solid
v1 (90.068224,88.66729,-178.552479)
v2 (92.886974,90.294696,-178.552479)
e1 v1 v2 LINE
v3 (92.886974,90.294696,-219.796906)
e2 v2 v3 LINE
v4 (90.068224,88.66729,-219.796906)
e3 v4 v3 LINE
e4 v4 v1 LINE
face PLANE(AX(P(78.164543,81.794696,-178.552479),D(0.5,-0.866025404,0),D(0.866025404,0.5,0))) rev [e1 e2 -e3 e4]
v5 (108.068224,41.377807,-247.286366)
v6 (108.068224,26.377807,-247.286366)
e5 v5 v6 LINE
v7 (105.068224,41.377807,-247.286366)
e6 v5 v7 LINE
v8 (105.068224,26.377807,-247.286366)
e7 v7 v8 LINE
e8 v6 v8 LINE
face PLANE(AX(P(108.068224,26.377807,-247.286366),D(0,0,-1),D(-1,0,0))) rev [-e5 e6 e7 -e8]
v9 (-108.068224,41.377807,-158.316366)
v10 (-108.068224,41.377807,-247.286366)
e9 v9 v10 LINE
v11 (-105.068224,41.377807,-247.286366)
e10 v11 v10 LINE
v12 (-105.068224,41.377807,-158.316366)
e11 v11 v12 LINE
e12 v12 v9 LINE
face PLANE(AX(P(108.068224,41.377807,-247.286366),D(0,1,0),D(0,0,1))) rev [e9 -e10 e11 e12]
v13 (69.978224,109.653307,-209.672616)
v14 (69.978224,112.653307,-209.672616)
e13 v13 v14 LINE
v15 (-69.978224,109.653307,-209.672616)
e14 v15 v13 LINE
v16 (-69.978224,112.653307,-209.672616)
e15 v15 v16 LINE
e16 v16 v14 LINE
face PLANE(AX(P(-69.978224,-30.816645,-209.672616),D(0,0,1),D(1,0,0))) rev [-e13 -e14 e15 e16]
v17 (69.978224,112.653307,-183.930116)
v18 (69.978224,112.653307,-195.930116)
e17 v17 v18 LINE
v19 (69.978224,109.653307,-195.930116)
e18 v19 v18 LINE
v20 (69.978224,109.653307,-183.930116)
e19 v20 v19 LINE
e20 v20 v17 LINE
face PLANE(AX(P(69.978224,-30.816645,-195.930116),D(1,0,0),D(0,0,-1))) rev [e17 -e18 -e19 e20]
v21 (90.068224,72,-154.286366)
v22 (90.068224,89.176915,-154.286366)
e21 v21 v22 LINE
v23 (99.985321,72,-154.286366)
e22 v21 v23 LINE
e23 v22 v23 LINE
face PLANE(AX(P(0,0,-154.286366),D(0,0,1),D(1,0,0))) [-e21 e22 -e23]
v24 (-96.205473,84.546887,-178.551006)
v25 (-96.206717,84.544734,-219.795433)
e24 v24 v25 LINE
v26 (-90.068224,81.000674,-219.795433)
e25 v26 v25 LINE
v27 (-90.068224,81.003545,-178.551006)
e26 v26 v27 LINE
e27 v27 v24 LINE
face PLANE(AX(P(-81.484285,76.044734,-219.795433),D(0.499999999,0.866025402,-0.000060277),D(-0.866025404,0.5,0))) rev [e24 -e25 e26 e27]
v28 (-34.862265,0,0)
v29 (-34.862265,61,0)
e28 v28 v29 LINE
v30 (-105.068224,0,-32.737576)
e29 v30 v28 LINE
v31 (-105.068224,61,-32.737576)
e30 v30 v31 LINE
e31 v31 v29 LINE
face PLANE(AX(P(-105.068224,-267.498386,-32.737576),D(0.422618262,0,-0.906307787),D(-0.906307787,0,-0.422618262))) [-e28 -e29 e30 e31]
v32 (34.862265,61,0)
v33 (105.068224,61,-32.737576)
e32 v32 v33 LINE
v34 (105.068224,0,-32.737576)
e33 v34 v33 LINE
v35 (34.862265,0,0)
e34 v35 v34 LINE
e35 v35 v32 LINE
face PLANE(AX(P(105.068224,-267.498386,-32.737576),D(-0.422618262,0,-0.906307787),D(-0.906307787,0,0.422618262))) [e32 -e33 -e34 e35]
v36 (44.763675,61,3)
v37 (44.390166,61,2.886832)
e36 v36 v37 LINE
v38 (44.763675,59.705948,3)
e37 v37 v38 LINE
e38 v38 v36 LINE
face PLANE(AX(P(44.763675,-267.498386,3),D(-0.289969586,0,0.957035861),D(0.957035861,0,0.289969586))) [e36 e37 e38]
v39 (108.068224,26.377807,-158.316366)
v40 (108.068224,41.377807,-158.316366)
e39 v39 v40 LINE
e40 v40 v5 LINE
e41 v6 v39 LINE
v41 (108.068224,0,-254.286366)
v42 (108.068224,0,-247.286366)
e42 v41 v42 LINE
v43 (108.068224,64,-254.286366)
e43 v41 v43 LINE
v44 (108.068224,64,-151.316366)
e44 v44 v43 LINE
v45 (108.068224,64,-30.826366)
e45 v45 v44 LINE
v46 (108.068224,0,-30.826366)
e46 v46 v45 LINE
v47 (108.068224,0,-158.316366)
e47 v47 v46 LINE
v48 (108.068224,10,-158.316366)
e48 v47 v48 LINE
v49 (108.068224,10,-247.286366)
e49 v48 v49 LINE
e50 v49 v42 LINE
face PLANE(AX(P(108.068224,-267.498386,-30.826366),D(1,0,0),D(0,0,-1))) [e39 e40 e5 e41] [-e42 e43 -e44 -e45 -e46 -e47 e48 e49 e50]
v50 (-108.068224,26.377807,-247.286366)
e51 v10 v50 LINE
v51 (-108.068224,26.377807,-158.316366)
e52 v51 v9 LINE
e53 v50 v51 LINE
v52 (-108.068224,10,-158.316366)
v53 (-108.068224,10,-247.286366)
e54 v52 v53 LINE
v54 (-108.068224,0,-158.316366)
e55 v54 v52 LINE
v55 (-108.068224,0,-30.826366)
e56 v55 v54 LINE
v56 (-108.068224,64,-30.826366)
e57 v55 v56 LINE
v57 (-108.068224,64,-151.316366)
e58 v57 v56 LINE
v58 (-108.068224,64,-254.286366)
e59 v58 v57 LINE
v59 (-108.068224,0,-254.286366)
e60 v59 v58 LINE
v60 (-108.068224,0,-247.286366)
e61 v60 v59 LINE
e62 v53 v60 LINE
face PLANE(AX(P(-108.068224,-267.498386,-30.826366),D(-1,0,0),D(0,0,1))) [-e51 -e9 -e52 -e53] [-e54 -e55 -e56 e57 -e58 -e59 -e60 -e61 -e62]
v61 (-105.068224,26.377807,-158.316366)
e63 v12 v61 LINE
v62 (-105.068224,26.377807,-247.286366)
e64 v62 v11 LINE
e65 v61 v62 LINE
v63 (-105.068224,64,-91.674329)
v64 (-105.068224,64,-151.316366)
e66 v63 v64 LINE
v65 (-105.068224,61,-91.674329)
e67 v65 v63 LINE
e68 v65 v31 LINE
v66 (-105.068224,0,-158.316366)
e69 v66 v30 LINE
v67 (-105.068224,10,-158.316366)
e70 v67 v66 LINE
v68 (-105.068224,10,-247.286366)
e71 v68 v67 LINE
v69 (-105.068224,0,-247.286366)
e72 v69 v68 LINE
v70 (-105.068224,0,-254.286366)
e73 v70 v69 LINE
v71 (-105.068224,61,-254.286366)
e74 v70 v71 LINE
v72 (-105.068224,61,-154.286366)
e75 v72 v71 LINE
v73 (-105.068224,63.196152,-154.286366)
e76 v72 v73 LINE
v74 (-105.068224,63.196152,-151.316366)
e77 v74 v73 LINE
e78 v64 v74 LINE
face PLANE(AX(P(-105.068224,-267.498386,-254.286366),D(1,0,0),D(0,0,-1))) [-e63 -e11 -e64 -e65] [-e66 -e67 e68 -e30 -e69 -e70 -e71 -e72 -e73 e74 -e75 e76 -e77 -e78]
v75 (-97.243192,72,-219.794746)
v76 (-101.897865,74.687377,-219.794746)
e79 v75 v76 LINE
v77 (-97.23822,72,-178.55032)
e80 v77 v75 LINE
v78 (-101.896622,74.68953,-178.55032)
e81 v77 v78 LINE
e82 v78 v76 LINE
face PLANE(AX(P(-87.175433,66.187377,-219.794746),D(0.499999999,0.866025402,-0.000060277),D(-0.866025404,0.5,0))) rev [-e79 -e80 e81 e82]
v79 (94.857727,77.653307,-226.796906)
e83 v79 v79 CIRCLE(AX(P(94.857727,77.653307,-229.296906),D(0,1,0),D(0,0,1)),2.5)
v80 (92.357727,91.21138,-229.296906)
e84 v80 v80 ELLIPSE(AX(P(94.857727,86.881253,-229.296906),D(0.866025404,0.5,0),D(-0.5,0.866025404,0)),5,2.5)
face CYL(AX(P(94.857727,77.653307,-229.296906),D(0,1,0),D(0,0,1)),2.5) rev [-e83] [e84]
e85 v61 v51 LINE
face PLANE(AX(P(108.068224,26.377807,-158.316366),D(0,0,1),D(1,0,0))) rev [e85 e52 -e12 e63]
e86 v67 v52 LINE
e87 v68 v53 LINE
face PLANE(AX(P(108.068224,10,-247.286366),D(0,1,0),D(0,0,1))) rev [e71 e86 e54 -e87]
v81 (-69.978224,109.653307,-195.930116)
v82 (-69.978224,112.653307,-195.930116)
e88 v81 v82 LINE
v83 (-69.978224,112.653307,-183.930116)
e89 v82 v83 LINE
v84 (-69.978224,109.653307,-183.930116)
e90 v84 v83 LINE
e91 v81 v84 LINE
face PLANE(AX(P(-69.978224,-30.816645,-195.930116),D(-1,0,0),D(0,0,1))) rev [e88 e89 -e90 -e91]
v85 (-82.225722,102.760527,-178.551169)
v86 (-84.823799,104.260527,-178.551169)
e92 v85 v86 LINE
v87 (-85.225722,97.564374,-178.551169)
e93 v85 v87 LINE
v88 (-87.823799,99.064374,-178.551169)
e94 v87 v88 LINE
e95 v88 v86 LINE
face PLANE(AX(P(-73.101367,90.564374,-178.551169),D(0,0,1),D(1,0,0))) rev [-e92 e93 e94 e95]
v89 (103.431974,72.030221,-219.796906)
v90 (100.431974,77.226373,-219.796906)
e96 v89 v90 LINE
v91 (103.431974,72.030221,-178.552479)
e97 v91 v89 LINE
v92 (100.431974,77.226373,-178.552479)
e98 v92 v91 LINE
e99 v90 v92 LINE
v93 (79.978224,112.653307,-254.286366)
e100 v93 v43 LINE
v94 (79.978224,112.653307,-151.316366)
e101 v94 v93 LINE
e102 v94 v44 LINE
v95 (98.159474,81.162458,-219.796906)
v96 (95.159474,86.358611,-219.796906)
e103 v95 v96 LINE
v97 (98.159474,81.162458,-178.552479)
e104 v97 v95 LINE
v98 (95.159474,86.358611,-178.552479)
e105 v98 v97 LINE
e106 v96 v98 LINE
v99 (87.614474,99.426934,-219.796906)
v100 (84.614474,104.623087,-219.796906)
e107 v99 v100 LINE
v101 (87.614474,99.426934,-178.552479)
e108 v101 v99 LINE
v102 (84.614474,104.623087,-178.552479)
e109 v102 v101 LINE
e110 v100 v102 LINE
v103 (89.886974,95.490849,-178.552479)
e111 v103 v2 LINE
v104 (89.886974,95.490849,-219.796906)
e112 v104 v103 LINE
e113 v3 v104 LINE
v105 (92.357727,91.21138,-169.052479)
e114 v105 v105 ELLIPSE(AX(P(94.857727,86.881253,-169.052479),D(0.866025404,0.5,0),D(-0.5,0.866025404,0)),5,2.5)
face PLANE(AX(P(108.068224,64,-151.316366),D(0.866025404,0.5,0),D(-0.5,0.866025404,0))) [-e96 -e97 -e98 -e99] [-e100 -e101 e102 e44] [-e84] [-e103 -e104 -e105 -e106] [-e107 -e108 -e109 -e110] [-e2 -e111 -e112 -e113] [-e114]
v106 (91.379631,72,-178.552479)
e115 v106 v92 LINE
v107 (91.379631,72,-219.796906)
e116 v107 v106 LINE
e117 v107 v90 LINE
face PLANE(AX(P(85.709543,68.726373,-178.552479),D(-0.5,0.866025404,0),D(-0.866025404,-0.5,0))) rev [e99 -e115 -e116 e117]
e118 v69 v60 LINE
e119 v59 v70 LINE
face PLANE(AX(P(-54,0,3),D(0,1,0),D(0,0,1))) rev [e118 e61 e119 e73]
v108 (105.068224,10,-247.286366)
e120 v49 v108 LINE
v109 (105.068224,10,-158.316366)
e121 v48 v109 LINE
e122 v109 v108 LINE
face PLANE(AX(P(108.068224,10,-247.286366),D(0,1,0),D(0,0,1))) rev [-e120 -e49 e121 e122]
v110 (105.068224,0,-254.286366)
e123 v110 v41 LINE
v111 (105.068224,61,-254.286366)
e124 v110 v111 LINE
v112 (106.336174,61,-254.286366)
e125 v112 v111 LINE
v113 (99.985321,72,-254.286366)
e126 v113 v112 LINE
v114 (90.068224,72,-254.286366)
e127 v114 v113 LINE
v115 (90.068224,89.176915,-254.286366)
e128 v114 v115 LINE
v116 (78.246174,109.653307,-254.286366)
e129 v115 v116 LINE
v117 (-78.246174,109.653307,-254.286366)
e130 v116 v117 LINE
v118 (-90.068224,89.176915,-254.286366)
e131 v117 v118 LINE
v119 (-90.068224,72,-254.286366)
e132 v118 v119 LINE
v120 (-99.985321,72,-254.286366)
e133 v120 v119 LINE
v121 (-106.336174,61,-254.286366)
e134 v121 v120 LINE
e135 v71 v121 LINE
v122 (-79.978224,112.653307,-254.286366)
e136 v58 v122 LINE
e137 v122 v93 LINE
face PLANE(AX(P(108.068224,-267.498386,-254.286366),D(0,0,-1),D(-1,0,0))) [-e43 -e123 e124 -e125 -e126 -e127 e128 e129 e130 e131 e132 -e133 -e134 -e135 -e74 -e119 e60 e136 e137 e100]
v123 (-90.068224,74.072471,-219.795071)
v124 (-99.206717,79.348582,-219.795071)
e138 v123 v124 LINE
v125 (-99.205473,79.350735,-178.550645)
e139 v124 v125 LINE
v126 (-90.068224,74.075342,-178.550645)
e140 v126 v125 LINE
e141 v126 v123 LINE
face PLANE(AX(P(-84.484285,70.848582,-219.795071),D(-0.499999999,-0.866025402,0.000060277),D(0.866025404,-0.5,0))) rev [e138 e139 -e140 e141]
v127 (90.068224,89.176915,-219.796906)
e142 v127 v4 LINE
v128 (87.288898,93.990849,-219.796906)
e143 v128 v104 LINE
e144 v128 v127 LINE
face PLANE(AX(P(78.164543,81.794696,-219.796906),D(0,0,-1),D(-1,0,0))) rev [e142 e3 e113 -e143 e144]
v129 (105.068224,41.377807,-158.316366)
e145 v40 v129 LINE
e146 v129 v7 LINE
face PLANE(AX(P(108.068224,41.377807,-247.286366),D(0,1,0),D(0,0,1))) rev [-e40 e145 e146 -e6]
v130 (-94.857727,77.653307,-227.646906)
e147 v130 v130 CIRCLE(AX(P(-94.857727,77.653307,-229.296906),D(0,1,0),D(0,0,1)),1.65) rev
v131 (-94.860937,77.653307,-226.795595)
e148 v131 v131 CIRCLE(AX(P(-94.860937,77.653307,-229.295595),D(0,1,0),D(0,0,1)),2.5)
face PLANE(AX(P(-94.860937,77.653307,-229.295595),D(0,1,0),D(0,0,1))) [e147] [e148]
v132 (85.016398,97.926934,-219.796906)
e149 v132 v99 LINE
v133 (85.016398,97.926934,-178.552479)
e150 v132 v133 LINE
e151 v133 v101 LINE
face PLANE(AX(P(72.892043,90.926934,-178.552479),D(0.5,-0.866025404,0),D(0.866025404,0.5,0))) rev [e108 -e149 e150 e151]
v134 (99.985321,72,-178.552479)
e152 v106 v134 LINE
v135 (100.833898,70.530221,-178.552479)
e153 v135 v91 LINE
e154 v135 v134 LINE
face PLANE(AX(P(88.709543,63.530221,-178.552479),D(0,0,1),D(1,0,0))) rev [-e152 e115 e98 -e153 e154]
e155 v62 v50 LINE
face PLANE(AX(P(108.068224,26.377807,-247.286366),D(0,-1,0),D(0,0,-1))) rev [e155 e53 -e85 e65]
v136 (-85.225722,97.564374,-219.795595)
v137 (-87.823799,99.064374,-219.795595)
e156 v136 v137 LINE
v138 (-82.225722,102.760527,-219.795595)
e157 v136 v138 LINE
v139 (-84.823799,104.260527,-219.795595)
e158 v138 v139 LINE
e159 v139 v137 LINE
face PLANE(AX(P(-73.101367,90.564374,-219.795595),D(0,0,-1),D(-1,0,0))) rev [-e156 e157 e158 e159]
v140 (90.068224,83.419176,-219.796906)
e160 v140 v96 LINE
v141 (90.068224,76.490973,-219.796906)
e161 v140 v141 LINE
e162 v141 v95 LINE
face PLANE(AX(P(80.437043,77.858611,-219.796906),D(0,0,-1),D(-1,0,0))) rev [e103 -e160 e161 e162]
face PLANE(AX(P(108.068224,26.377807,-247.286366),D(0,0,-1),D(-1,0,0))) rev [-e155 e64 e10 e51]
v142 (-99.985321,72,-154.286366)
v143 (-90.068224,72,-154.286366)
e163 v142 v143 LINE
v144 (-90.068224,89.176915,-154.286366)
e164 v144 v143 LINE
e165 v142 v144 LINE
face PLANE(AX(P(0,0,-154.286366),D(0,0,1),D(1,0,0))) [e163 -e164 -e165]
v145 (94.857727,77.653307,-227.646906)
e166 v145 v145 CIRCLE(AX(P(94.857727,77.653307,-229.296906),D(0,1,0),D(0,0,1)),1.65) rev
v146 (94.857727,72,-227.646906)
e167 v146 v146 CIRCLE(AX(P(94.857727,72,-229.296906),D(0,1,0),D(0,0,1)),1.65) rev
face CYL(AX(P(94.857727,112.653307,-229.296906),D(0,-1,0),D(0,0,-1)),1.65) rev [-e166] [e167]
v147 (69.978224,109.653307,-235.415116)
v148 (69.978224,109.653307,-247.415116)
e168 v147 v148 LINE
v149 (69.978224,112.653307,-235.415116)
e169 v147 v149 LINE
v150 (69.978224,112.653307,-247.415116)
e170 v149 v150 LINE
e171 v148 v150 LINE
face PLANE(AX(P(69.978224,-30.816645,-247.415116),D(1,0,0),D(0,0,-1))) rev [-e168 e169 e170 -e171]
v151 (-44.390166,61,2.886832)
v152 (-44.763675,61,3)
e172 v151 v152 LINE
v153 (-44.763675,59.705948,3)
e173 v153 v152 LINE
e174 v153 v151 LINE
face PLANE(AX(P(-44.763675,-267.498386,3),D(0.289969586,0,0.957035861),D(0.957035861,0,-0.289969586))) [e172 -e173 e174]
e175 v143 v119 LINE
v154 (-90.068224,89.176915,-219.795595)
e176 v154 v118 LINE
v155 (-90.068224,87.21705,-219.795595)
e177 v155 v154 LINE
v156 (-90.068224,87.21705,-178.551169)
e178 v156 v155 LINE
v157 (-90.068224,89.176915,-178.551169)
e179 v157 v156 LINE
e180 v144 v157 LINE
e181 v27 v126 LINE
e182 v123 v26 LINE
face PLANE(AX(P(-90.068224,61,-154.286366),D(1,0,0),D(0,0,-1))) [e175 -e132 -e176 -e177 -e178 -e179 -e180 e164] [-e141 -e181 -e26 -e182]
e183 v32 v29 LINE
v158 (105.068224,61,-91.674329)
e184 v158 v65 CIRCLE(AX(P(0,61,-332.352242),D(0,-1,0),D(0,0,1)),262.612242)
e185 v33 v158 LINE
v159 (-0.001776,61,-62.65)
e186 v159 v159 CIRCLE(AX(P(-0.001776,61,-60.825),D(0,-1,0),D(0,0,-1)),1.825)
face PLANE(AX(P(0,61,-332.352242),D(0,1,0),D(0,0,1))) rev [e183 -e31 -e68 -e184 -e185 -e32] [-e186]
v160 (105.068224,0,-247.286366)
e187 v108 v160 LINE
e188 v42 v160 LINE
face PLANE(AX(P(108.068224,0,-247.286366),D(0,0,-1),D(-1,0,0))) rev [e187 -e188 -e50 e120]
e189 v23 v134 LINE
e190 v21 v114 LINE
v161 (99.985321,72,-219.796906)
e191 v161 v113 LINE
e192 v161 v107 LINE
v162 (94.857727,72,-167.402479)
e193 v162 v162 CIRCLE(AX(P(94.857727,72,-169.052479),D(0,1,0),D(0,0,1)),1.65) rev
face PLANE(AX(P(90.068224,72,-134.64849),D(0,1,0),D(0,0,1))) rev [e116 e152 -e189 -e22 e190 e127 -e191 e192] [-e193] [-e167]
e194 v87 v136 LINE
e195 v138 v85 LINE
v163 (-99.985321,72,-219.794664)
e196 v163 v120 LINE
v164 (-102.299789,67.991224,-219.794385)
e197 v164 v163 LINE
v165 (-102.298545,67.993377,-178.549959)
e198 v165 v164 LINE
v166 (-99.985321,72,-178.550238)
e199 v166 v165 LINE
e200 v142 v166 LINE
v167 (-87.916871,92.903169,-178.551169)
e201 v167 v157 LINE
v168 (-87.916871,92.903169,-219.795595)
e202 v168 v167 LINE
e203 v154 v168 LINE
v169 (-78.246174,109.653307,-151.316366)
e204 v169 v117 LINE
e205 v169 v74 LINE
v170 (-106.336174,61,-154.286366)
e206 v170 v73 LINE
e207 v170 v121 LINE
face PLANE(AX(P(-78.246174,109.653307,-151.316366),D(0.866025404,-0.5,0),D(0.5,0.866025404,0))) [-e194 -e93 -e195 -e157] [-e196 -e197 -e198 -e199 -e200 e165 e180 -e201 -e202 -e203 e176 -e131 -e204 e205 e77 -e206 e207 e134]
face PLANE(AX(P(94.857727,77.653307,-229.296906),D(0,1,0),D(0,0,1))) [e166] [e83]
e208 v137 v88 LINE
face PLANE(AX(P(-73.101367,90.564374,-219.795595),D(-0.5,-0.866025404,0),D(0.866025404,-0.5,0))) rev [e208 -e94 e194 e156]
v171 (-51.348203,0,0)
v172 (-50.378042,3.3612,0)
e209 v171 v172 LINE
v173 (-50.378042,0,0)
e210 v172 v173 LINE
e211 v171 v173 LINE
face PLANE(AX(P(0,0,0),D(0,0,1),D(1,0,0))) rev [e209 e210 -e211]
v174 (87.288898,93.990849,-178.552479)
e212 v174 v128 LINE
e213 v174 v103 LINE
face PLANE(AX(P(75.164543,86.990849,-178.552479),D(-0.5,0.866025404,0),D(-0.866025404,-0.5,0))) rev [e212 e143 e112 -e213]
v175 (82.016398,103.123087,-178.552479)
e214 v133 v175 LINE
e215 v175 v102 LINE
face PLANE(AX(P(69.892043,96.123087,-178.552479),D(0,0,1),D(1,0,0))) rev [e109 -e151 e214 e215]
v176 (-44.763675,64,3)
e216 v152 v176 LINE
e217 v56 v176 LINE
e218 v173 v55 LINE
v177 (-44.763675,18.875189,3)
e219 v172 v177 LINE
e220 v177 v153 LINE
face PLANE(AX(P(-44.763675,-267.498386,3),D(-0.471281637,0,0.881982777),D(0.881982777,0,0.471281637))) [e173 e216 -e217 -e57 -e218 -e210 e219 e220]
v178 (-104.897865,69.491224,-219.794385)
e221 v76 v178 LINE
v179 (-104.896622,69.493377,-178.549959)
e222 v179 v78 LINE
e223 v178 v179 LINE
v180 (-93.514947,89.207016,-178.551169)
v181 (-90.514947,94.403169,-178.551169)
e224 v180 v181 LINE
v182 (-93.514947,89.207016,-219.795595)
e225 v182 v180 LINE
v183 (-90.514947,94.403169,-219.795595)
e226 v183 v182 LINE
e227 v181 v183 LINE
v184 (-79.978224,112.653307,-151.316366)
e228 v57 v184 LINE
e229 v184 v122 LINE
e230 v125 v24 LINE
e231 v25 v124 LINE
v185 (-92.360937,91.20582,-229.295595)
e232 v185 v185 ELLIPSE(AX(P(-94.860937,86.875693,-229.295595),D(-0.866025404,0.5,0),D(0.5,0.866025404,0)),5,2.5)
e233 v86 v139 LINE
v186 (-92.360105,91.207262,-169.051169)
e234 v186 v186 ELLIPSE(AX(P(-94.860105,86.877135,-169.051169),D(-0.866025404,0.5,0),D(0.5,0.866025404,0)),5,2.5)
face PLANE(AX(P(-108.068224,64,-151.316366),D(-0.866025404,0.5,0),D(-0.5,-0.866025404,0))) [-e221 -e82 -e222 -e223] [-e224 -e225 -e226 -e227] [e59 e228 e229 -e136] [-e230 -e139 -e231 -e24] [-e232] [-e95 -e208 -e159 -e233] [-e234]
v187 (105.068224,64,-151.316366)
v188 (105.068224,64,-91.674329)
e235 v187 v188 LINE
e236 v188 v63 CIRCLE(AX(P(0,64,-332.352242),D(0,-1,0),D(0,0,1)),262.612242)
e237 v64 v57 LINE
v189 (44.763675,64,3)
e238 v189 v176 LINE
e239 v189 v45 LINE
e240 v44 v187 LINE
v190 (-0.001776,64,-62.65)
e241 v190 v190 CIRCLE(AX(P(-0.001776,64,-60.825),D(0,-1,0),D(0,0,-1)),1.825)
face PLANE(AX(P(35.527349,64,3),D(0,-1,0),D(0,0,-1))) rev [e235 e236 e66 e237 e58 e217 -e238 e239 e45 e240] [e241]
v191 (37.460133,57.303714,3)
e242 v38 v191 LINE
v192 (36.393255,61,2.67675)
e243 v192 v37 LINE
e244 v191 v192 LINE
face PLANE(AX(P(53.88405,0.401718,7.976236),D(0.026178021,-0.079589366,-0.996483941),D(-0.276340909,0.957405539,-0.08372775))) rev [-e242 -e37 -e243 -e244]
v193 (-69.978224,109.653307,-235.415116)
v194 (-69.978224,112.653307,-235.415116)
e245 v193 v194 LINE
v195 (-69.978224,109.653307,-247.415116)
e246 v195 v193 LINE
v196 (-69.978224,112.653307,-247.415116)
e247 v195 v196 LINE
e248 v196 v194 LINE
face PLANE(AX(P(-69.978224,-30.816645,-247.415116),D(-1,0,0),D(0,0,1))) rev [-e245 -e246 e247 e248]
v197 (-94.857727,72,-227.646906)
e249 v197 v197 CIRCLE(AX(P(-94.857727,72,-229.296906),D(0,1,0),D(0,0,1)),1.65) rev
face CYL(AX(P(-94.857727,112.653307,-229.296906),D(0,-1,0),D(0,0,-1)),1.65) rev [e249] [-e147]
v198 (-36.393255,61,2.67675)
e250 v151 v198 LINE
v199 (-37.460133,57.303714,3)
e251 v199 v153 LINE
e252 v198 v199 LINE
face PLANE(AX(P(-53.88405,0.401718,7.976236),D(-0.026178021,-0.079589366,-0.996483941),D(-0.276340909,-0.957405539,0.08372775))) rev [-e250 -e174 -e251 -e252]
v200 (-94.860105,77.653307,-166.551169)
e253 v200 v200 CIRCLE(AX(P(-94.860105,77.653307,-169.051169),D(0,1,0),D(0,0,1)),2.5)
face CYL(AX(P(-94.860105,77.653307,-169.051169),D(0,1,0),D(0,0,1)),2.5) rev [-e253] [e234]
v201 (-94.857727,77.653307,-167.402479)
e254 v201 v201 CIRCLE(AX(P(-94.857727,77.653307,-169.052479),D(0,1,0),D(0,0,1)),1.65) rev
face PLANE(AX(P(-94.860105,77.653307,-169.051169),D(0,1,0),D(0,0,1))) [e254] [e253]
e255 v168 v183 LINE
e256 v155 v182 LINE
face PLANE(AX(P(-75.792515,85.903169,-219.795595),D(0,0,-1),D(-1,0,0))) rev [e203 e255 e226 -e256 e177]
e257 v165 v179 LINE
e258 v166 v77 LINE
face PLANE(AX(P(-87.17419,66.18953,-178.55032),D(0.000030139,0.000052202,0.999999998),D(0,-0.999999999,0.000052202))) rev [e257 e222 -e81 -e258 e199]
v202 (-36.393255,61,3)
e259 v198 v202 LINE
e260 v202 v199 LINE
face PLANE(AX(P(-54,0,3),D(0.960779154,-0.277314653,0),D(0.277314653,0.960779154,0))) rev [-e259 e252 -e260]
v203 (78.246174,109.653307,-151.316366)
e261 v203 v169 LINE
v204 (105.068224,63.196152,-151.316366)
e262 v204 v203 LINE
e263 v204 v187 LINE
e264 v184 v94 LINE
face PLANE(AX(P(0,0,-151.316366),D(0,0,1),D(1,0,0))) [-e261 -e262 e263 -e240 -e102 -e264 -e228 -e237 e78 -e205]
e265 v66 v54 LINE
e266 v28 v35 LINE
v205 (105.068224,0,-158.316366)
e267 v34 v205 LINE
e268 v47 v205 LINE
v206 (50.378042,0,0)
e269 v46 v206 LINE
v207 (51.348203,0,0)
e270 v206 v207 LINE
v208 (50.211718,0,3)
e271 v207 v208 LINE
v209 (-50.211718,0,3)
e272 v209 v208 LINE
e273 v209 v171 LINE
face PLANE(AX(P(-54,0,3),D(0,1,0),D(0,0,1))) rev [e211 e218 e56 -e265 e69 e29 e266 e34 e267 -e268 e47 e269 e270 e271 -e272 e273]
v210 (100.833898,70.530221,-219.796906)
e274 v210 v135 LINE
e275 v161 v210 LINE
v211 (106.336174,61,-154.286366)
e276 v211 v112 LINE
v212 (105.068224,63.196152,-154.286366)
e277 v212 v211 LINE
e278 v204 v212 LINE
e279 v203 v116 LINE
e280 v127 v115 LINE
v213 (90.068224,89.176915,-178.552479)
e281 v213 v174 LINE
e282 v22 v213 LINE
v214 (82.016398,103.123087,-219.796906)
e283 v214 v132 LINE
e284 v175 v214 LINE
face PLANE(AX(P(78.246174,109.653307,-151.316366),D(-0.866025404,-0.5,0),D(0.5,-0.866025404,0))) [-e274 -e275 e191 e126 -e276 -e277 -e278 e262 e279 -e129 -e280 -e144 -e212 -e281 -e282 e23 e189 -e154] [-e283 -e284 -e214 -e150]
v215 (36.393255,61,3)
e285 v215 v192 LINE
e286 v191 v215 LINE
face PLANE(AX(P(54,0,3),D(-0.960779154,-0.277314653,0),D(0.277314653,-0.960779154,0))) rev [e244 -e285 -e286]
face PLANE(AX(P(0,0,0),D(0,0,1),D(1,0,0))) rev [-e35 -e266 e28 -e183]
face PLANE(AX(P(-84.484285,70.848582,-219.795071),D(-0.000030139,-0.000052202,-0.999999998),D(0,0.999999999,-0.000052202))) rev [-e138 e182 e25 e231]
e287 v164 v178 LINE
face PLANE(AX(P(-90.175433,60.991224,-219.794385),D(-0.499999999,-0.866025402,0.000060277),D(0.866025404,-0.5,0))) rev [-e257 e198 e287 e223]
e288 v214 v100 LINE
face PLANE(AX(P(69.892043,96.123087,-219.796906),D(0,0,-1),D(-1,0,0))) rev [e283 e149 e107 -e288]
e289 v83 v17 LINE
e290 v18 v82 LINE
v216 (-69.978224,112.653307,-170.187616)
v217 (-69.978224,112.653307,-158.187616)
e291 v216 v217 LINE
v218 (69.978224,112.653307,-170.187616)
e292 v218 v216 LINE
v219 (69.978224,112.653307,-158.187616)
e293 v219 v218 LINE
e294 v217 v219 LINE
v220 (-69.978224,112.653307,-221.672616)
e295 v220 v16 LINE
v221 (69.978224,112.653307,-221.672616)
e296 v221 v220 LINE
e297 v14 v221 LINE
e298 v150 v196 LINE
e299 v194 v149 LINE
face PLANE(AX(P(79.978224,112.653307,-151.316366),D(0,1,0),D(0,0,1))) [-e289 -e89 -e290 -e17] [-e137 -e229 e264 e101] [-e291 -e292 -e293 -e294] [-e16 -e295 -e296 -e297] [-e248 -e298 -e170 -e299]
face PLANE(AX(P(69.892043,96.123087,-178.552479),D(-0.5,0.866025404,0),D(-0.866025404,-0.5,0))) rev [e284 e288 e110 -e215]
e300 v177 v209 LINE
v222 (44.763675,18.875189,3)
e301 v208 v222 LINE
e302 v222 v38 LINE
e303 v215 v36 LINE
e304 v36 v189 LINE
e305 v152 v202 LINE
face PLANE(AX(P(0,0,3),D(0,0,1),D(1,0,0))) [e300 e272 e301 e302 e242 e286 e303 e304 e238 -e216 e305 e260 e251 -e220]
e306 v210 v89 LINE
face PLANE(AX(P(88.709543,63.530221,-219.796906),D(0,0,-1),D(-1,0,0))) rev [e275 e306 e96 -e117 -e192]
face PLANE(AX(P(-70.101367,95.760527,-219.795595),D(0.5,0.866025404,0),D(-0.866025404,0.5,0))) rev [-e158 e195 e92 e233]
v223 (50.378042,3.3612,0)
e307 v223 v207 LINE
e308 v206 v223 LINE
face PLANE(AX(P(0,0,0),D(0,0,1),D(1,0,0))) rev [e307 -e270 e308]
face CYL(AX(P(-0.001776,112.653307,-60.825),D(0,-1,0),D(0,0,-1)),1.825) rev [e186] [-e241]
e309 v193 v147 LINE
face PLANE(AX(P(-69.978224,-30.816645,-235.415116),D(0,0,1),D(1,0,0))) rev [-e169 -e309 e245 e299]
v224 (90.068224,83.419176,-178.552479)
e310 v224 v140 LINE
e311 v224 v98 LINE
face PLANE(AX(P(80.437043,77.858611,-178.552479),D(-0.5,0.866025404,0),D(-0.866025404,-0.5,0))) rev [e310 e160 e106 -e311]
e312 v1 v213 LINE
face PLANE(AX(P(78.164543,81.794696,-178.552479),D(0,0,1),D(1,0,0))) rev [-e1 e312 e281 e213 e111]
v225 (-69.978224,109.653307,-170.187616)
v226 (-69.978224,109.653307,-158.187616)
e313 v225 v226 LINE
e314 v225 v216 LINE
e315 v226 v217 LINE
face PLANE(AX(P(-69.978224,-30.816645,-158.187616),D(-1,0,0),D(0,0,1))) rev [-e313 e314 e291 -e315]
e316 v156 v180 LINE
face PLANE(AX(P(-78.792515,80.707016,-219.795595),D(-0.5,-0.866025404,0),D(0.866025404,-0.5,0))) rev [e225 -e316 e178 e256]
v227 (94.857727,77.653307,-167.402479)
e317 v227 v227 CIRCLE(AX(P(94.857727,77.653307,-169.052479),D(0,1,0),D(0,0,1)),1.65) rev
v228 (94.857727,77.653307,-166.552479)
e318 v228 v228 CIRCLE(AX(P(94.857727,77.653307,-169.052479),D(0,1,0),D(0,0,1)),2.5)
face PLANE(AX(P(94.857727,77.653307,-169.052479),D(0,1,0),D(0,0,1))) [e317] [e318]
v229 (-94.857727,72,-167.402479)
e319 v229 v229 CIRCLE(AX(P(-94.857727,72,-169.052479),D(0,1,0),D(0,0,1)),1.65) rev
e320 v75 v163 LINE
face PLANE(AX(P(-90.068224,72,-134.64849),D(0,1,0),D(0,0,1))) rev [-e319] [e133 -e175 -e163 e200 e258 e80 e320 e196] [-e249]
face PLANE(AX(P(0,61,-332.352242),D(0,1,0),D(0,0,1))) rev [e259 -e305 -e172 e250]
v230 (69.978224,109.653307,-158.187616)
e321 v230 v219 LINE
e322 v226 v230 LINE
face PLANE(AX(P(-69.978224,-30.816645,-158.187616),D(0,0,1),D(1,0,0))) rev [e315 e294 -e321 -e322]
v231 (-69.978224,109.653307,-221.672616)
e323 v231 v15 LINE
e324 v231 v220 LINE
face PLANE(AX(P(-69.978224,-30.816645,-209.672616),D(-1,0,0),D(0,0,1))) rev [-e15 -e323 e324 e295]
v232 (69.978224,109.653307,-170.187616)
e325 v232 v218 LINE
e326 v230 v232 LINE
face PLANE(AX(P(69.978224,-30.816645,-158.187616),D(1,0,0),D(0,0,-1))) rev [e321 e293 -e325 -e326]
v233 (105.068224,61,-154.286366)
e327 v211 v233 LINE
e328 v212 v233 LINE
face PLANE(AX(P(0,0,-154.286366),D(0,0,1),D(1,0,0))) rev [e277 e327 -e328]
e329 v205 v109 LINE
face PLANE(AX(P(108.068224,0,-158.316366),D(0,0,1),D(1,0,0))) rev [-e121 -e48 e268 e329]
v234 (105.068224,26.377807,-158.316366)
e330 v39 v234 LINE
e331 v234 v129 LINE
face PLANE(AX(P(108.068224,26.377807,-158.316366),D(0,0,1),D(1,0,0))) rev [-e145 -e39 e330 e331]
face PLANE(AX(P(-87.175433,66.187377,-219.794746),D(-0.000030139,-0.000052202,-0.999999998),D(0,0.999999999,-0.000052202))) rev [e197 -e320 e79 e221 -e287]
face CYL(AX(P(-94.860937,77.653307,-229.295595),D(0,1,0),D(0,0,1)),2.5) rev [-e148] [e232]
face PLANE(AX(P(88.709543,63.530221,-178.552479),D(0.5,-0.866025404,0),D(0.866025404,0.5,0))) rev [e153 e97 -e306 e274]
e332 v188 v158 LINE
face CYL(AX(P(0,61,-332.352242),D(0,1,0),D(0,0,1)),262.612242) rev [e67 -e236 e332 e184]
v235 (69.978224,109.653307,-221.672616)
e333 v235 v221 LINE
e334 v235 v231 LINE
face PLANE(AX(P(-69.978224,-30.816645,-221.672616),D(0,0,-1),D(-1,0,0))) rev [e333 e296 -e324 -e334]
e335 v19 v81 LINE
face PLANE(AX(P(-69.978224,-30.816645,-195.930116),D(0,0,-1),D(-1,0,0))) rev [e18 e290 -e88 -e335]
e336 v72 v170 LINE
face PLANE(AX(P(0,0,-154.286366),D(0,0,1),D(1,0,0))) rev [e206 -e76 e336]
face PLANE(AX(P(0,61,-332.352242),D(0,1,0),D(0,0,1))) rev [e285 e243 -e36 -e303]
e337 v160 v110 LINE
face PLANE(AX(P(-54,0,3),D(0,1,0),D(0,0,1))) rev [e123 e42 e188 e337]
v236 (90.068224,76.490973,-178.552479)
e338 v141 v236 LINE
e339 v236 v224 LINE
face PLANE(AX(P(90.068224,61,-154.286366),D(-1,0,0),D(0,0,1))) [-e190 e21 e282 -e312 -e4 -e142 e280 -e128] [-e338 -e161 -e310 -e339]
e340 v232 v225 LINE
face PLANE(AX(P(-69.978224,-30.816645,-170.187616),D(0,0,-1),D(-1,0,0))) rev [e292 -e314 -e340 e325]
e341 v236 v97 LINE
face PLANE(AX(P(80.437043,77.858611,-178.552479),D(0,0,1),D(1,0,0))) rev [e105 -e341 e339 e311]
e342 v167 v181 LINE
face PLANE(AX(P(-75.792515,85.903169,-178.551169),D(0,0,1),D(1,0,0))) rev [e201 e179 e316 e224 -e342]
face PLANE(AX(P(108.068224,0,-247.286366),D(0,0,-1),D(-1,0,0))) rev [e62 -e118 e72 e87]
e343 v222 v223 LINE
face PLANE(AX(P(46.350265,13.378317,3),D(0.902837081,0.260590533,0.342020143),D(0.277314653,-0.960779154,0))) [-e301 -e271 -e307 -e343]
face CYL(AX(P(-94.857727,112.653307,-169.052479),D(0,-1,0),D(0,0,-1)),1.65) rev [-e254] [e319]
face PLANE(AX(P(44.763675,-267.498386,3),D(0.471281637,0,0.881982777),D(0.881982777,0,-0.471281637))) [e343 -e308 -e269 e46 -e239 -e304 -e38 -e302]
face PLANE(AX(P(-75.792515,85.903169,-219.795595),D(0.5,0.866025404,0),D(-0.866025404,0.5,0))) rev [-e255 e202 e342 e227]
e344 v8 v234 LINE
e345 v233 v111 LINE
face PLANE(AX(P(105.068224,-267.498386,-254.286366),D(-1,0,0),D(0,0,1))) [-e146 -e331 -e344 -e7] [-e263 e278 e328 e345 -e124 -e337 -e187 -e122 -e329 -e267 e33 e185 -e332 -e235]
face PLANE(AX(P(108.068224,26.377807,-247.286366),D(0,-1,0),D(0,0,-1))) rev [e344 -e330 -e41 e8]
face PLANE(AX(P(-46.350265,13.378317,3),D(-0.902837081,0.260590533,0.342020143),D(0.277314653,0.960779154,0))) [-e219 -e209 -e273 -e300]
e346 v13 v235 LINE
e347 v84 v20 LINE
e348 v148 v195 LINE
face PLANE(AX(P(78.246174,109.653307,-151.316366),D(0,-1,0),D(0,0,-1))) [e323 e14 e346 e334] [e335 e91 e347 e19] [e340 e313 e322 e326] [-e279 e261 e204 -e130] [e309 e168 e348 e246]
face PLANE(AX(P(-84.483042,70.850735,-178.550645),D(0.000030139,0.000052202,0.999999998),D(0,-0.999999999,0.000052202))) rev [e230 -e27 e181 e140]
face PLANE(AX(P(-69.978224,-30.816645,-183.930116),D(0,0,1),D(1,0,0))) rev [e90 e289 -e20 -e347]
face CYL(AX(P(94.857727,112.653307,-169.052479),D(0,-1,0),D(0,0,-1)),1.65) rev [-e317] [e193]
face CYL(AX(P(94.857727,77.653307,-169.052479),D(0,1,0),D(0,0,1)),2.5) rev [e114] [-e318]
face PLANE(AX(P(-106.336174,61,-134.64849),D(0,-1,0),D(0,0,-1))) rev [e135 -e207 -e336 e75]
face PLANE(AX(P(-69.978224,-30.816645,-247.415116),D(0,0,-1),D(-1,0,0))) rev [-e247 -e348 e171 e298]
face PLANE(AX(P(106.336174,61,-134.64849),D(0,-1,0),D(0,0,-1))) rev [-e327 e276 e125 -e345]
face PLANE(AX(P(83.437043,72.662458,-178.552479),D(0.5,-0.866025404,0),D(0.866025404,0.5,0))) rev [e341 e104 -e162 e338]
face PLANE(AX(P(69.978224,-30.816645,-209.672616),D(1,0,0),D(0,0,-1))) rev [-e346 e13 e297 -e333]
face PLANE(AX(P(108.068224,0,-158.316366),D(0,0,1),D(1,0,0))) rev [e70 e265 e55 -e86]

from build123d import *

# Parameters (mm, degrees)
SALIENTE_EXTRUIR15_DEPTH = 3
SALIENTE_EXTRUIR16_REACH = 85.791
CHAFL_N1_SIZE            = 8
CHAFL_N1_SIZE_2          = 2.205109306
CHAFL_N2_SIZE            = 2.205109306
CHAFL_N2_SIZE_2          = 8
SALIENTE_EXTRUIR17_DEPTH = 3
SALIENTE_EXTRUIR18_DEPTH = 102.97
CROQUIS28_R              = 1.825
CORTAR_EXTRUIR6_DEPTH    = 283.951050372
SALIENTE_EXTRUIR19_DEPTH = 100
CROQUIS30_R              = 1.65
CORTAR_EXTRUIR7_DEPTH    = 283.951050372
CORTAR_EXTRUIR9_REACH    = 302.941
CORTAR_EXTRUIR10_START   = -40.653307
CROQUIS34_R              = 2.5
CORTAR_EXTRUIR10_DEPTH   = 35
CROQUIS35_W              = 41.244426213
CROQUIS35_H              = 6
CORTAR_EXTRUIR11_DEPTH   = 17
CROQUIS36_W              = 41.244426207
CROQUIS36_H              = 6
CORTAR_EXTRUIR12_DEPTH   = 17
CROQUIS37_W              = 139.956448948
CROQUIS37_H              = 12
CORTAR_EXTRUIR13_DEPTH   = 3
CROQUIS39_W              = 88.97
CROQUIS39_H              = 15
CROQUIS39_H_2            = 10
CORTAR_EXTRUIR14_DEPTH   = 353.231866742
CHAFL_N4_SIZE            = 3.639702343
CHAFL_N4_SIZE_2          = 10


with BuildPart() as part:
    # Croquis22 → Saliente-Extruir15 (new body)
    with BuildSketch(Plane.XY):
        Polygon((-54, 0), (54, 0), (35.527349199, 64), (-35.527349199, 64), align=None)
    extrude(amount=SALIENTE_EXTRUIR15_DEPTH)

    # Saliente-Extruir16: up to this face of the body (flat: up to its plane)
    saliente_extruir16_end = Plane(part.part.faces().sort_by_distance((0, 0, 1.5))[0])
    # Croquis23 → Saliente-Extruir16 (add, up to the picked face)
    with BuildSketch(Plane(origin=(0, 64, 0), x_dir=(1, 0, 0), z_dir=(0, 1, 0)), mode=Mode.PRIVATE) as saliente_extruir16_sk1:
        Polygon((108.068224474, 30.82636567), (108.068224474, 254.28636567), (105.068224474, 254.28636567), (105.068224474, 32.737576452), (34.862265211, 0), (44.7636746, -3), align=None)
    saliente_extruir16_tool1 = split(extrude(saliente_extruir16_sk1.sketch, amount=-SALIENTE_EXTRUIR16_REACH, mode=Mode.PRIVATE), bisect_by=saliente_extruir16_end, keep=Keep.BOTH, mode=Mode.PRIVATE)
    # Croquis23 → Saliente-Extruir16 (add, up to the picked face)
    with BuildSketch(Plane(origin=(0, 64, 0), x_dir=(1, 0, 0), z_dir=(0, 1, 0)), mode=Mode.PRIVATE) as saliente_extruir16_sk2:
        Polygon((-44.7636746, -3), (-108.068224474, 30.82636567), (-108.068224474, 254.28636567), (-105.068224474, 254.28636567), (-105.068224474, 32.737576452), (-34.862265211, 0), align=None)
    saliente_extruir16_tool2 = split(extrude(saliente_extruir16_sk2.sketch, amount=-SALIENTE_EXTRUIR16_REACH, mode=Mode.PRIVATE), bisect_by=saliente_extruir16_end, keep=Keep.BOTH, mode=Mode.PRIVATE)
    add(saliente_extruir16_tool1.solids().sort_by(Axis((105.393241, 64, -142.556366), (0, -1, 0)))[0])
    add(saliente_extruir16_tool2.solids().sort_by(Axis((-75.155279, 64, -16.272473), (0, -1, 0)))[0])

    # Chaflán1
    # the kernel refuses this chamfer: 8, 2.205109306 mm, written as the material it adds along each edge
    with BuildSketch(Plane(origin=(-50.503325007, 12.114514694, 4.739040428), x_dir=(-0.919298302367056, 0.2887303877017334, 0.267442319917128), z_dir=(0.2763409092722936, 0.9574055388276669, -0.0837277497886264))) as chafl_n1_piece_1_section:
        Polygon((CHAFL_N1_SIZE * 0.999943641705, CHAFL_N1_SIZE * 0.0106166574103), (CHAFL_N1_SIZE_2 * 0.268384707917, CHAFL_N1_SIZE_2 * 0.963311812656), (0, 0), align=None)
    chafl_n1_piece_1 = extrude(amount=74.96402277, mode=Mode.PRIVATE)
    chafl_n1_piece_1 = split(chafl_n1_piece_1, bisect_by=Plane(origin=(-40.189826284, 64, 2.253573464), z_dir=(0, -1, 0)), keep=Keep.TOP, mode=Mode.PRIVATE)
    chafl_n1_piece_1 = split(chafl_n1_piece_1, bisect_by=Plane(origin=(-40.189826284, 55.464802275, 3), z_dir=(0, 0, -1)), keep=Keep.TOP, mode=Mode.PRIVATE)
    add(chafl_n1_piece_1)

    # Chaflán2
    # the kernel refuses this chamfer: 8, 2.205109306 mm, written as the material it adds along each edge
    with BuildSketch(Plane(origin=(50.503325007, 12.114514694, 4.739040428), x_dir=(-0.1610184044916604, 0.03976595413217484, 0.9861499593403216), z_dir=(-0.27634090927229366, 0.957405538827667, -0.08372774978862642))) as chafl_n2_piece_1_section:
        Polygon((CHAFL_N2_SIZE * 0.989624861472, CHAFL_N2_SIZE * 0.143675444677), (CHAFL_N2_SIZE_2 * 0.137719182616, CHAFL_N2_SIZE_2 * 0.990471315455), (0, 0), align=None)
    chafl_n2_piece_1 = extrude(amount=74.96402277, mode=Mode.PRIVATE)
    chafl_n2_piece_1 = split(chafl_n2_piece_1, bisect_by=Plane(origin=(40.189826284, 55.464802275, 3), z_dir=(0, 0, -1)), keep=Keep.TOP, mode=Mode.PRIVATE)
    chafl_n2_piece_1 = split(chafl_n2_piece_1, bisect_by=Plane(origin=(40.189826284, 64, 2.253573464), z_dir=(0, -1, 0)), keep=Keep.TOP, mode=Mode.PRIVATE)
    add(chafl_n2_piece_1)

    # Croquis24 → Saliente-Extruir17 (add)
    with BuildSketch(Plane(origin=(0, 64, 0), x_dir=(1, 0, 0), z_dir=(0, 1, 0))):
        with BuildLine():
            Line((-108.068224474, 93.00636567), (-108.068224474, 30.82636567))
            Line((-108.068224474, 30.82636567), (-44.7636746, -3))
            Line((-44.7636746, -3), (44.7636746, -3))
            Line((44.7636746, -3), (108.068224474, 30.82636567))
            Line((108.068224474, 30.82636567), (108.068224474, 93.00636567))
            ThreePointArc((108.068224474, 93.00636567), (0, 69.74), (-108.068224474, 93.00636567))
        make_face()
    extrude(amount=-SALIENTE_EXTRUIR17_DEPTH)

    # Croquis25 → Saliente-Extruir18 (add)
    with BuildSketch(Plane(origin=(0, 0, -254.28636567), x_dir=(-1, 0, 0), z_dir=(0, 0, -1))):
        Polygon((-108.068224474, 64), (-79.978224474, 112.653307185), (79.978224474, 112.653307185), (108.068224474, 64), (105.068224474, 63.196152423), (78.246173666, 109.653307185), (-78.246173666, 109.653307185), (-105.068224474, 63.196152423), align=None)
    extrude(amount=-SALIENTE_EXTRUIR18_DEPTH)

    # Croquis28 → Cortar-Extruir6 (cut, through all)
    with BuildSketch(Plane.XZ.offset(-61)):
        with Locations(Location((-0.001775526, -60.825, 0), (0, 0, 270))):
            Circle(CROQUIS28_R)
    extrude(amount=-CORTAR_EXTRUIR6_DEPTH, mode=Mode.SUBTRACT)

    # Croquis29 → Saliente-Extruir19 (add)
    with BuildSketch(Plane(origin=(0, 0, -254.28636567), x_dir=(-1, 0, 0), z_dir=(0, 0, -1))):
        Polygon((-105.068224474, 61), (-90.068224474, 61), (-90.068224474, 89.176914536), (-105.068224474, 63.196152423), align=None)
        Polygon((105.068224474, 61), (105.068224474, 63.196152423), (90.068224474, 89.176914536), (90.068224474, 61), align=None)
    extrude(amount=-SALIENTE_EXTRUIR19_DEPTH)

    # Croquis30 → Cortar-Extruir7 (cut, through all)
    with BuildSketch(Plane.XZ.offset(-61)):
        with Locations(Location((94.857727132, -169.052479414, 0), (0, 0, 270))):
            Circle(CROQUIS30_R)
        with Locations(Location((94.857727132, -229.296905627, 0), (0, 0, 270))):
            Circle(CROQUIS30_R)
        with Locations(Location((-94.857727132, -229.296905627, 0), (0, 0, 180))):
            Circle(CROQUIS30_R)
        with Locations(Location((-94.857727132, -169.052479414, 0), (0, 0, 180))):
            Circle(CROQUIS30_R)
    extrude(amount=-CORTAR_EXTRUIR7_DEPTH, mode=Mode.SUBTRACT)

    # Cortar-Extruir9: up to this face of the body (flat: up to its plane)
    cortar_extruir9_end = Plane(part.part.faces().sort_by_distance((95.429754053, 70.445236449, -154.28636567))[0])
    # Croquis33 → Cortar-Extruir9 (cut, up to the picked face)
    with BuildSketch(Plane(origin=(0, 0, -254.28636567), x_dir=(-1, 0, 0), z_dir=(0, 0, -1)), mode=Mode.PRIVATE) as cortar_extruir9_sk1:
        Polygon((-90.068224474, 61), (-90.068224474, 72), (-99.985320705, 72), (-106.336173666, 61), align=None)
    cortar_extruir9_tool1 = split(extrude(cortar_extruir9_sk1.sketch, amount=-CORTAR_EXTRUIR9_REACH, mode=Mode.PRIVATE), bisect_by=cortar_extruir9_end, keep=Keep.BOTH, mode=Mode.PRIVATE)
    # Croquis33 → Cortar-Extruir9 (cut, up to the picked face)
    with BuildSketch(Plane(origin=(0, 0, -254.28636567), x_dir=(-1, 0, 0), z_dir=(0, 0, -1)), mode=Mode.PRIVATE) as cortar_extruir9_sk2:
        Polygon((99.985320705, 72), (106.336173666, 61), (90.068224474, 61), (90.068224474, 72), align=None)
    cortar_extruir9_tool2 = split(extrude(cortar_extruir9_sk2.sketch, amount=-CORTAR_EXTRUIR9_REACH, mode=Mode.PRIVATE), bisect_by=cortar_extruir9_end, keep=Keep.BOTH, mode=Mode.PRIVATE)
    add(cortar_extruir9_tool1.solids().sort_by(Axis((96.742846, 66.055348, -254.286366), (0, 0, 1)))[0], mode=Mode.SUBTRACT)
    add(cortar_extruir9_tool2.solids().sort_by(Axis((-96.742846, 66.055348, -254.286366), (0, 0, 1)))[0], mode=Mode.SUBTRACT)

    # Croquis34 → Cortar-Extruir10 (cut)
    with BuildSketch(Plane.XZ.offset(-72).offset(CORTAR_EXTRUIR10_START)):
        with Locations(Location((94.857727132, -169.052479414, 0), (0, 0, 90))):
            Circle(CROQUIS34_R)
        with Locations(Location((94.857727132, -229.296905627, 0), (0, 0, 90))):
            Circle(CROQUIS34_R)
        with Locations(Location((-94.860104661, -169.05116859, 0), (0, 0, 90))):
            Circle(CROQUIS34_R)
        with Locations(Location((-94.860937159, -229.295594797, 0), (0, 0, 90))):
            Circle(CROQUIS34_R)
    extrude(amount=CORTAR_EXTRUIR10_DEPTH, mode=Mode.SUBTRACT)

    # Croquis35 → Cortar-Extruir11 (cut)
    with BuildSketch(Plane(origin=(108.763981276, 62.794913868, 0), x_dir=(0, 0, -1), z_dir=(0.8660254037844364, 0.5000000000000041, 0))):
        with Locations((199.174692521, 34.754013605)):
            Rectangle(CROQUIS35_W, CROQUIS35_H)
        with Locations((199.174692521, 45.299013605)):
            Rectangle(CROQUIS35_W, CROQUIS35_H)
        with Locations((199.174692521, 24.209013605)):
            Rectangle(CROQUIS35_W, CROQUIS35_H)
        with Locations((199.174692521, 13.664013605)):
            Rectangle(CROQUIS35_W, CROQUIS35_H)
    extrude(amount=-CORTAR_EXTRUIR11_DEPTH, mode=Mode.SUBTRACT)

    # Croquis36 → Cortar-Extruir12 (cut)
    with BuildSketch(Plane(origin=(-108.763981276, 62.794913868, 0), x_dir=(0, 0, 1), z_dir=(-0.8660254037844363, 0.500000000000004, 0))):
        with Locations((-199.173381694, 33.498068951)):
            Rectangle(CROQUIS36_W, CROQUIS36_H)
        with Locations((-199.173381694, 44.880365387)):
            Rectangle(CROQUIS36_W, CROQUIS36_H)
        Polygon((-219.795070879, 19.114529475), (-219.795432544, 25.114529465), (-178.551006411, 25.117015574), (-178.550644747, 19.117015585), align=None)
        Polygon((-219.794384783, 7.73223306), (-178.549958651, 7.734719169), (-178.550320316, 13.734719158), (-219.794746448, 13.732233049), align=None)
    extrude(amount=-CORTAR_EXTRUIR12_DEPTH, mode=Mode.SUBTRACT)

    # Croquis37 → Cortar-Extruir13 (cut)
    with BuildSketch(Plane(origin=(0, 112.653307185, 0), x_dir=(1, 0, 0), z_dir=(0, 1, 0))):
        with Locations((0, 241.41511567)):
            Rectangle(CROQUIS37_W, CROQUIS37_H)
        with Locations((0, 215.67261567)):
            Rectangle(CROQUIS37_W, CROQUIS37_H)
        with Locations((0, 189.93011567)):
            Rectangle(CROQUIS37_W, CROQUIS37_H)
        with Locations((0, 164.18761567)):
            Rectangle(CROQUIS37_W, CROQUIS37_H)
    extrude(amount=-CORTAR_EXTRUIR13_DEPTH, mode=Mode.SUBTRACT)

    # Croquis39 → Cortar-Extruir14 (cut, through all)
    with BuildSketch(Plane.ZY.offset(108.068224474)):
        with Locations((-202.80136567, 33.877807024)):
            Rectangle(CROQUIS39_W, CROQUIS39_H)
        with Locations((-202.80136567, 5)):
            Rectangle(CROQUIS39_W, CROQUIS39_H_2)
    extrude(amount=-CORTAR_EXTRUIR14_DEPTH, mode=Mode.SUBTRACT)

    # Chaflán4
    # the kernel refuses this chamfer: 10, 3.639702343 mm, written as the material it takes off along each edge
    with BuildSketch(Plane(origin=(61.194082129, -24.924482209, 3), x_dir=(-0.9560553519940534, -0.27595119786771466, 0.0990409022520496), z_dir=(-0.27731465330238175, 0.9607791541575931, 0))) as chafl_n4_piece_1_section:
        Polygon((CHAFL_N4_SIZE * 0.995083363089, -CHAFL_N4_SIZE * 0.0990409022429), (-CHAFL_N4_SIZE_2 * 0.099040902252, -CHAFL_N4_SIZE_2 * 0.995083363182), (0, 0), align=None)
    chafl_n4_piece_1 = extrude(amount=85.19019596, mode=Mode.PRIVATE)
    chafl_n4_piece_1 = split(chafl_n4_piece_1, bisect_by=Plane(origin=(49.101684897, 9.648205997, 0.682013017), z_dir=(0.47128163735993633, 0, 0.881982776638715)), keep=Keep.TOP, mode=Mode.PRIVATE)
    add(chafl_n4_piece_1, mode=Mode.SUBTRACT)
    with BuildSketch(Plane(origin=(-37.569592471, 56.924482209, 3), x_dir=(0.9560553519940533, -0.27595119786771466, 0.09904090225204958), z_dir=(-0.27731465330238175, -0.9607791541575931, 0))) as chafl_n4_piece_2_section:
        Polygon((CHAFL_N4_SIZE * 0.995083363089, -CHAFL_N4_SIZE * 0.0990409022429), (-CHAFL_N4_SIZE_2 * 0.0990409022521, -CHAFL_N4_SIZE_2 * 0.995083363182), (0, 0), align=None)
    chafl_n4_piece_2 = extrude(amount=85.19019596, mode=Mode.PRIVATE)
    chafl_n4_piece_2 = split(chafl_n4_piece_2, bisect_by=Plane(origin=(-49.101684897, 9.648205997, 0.682013017), z_dir=(-0.47128163735993633, 0, 0.881982776638715)), keep=Keep.TOP, mode=Mode.PRIVATE)
    add(chafl_n4_piece_2, mode=Mode.SUBTRACT)


solid = part.part
